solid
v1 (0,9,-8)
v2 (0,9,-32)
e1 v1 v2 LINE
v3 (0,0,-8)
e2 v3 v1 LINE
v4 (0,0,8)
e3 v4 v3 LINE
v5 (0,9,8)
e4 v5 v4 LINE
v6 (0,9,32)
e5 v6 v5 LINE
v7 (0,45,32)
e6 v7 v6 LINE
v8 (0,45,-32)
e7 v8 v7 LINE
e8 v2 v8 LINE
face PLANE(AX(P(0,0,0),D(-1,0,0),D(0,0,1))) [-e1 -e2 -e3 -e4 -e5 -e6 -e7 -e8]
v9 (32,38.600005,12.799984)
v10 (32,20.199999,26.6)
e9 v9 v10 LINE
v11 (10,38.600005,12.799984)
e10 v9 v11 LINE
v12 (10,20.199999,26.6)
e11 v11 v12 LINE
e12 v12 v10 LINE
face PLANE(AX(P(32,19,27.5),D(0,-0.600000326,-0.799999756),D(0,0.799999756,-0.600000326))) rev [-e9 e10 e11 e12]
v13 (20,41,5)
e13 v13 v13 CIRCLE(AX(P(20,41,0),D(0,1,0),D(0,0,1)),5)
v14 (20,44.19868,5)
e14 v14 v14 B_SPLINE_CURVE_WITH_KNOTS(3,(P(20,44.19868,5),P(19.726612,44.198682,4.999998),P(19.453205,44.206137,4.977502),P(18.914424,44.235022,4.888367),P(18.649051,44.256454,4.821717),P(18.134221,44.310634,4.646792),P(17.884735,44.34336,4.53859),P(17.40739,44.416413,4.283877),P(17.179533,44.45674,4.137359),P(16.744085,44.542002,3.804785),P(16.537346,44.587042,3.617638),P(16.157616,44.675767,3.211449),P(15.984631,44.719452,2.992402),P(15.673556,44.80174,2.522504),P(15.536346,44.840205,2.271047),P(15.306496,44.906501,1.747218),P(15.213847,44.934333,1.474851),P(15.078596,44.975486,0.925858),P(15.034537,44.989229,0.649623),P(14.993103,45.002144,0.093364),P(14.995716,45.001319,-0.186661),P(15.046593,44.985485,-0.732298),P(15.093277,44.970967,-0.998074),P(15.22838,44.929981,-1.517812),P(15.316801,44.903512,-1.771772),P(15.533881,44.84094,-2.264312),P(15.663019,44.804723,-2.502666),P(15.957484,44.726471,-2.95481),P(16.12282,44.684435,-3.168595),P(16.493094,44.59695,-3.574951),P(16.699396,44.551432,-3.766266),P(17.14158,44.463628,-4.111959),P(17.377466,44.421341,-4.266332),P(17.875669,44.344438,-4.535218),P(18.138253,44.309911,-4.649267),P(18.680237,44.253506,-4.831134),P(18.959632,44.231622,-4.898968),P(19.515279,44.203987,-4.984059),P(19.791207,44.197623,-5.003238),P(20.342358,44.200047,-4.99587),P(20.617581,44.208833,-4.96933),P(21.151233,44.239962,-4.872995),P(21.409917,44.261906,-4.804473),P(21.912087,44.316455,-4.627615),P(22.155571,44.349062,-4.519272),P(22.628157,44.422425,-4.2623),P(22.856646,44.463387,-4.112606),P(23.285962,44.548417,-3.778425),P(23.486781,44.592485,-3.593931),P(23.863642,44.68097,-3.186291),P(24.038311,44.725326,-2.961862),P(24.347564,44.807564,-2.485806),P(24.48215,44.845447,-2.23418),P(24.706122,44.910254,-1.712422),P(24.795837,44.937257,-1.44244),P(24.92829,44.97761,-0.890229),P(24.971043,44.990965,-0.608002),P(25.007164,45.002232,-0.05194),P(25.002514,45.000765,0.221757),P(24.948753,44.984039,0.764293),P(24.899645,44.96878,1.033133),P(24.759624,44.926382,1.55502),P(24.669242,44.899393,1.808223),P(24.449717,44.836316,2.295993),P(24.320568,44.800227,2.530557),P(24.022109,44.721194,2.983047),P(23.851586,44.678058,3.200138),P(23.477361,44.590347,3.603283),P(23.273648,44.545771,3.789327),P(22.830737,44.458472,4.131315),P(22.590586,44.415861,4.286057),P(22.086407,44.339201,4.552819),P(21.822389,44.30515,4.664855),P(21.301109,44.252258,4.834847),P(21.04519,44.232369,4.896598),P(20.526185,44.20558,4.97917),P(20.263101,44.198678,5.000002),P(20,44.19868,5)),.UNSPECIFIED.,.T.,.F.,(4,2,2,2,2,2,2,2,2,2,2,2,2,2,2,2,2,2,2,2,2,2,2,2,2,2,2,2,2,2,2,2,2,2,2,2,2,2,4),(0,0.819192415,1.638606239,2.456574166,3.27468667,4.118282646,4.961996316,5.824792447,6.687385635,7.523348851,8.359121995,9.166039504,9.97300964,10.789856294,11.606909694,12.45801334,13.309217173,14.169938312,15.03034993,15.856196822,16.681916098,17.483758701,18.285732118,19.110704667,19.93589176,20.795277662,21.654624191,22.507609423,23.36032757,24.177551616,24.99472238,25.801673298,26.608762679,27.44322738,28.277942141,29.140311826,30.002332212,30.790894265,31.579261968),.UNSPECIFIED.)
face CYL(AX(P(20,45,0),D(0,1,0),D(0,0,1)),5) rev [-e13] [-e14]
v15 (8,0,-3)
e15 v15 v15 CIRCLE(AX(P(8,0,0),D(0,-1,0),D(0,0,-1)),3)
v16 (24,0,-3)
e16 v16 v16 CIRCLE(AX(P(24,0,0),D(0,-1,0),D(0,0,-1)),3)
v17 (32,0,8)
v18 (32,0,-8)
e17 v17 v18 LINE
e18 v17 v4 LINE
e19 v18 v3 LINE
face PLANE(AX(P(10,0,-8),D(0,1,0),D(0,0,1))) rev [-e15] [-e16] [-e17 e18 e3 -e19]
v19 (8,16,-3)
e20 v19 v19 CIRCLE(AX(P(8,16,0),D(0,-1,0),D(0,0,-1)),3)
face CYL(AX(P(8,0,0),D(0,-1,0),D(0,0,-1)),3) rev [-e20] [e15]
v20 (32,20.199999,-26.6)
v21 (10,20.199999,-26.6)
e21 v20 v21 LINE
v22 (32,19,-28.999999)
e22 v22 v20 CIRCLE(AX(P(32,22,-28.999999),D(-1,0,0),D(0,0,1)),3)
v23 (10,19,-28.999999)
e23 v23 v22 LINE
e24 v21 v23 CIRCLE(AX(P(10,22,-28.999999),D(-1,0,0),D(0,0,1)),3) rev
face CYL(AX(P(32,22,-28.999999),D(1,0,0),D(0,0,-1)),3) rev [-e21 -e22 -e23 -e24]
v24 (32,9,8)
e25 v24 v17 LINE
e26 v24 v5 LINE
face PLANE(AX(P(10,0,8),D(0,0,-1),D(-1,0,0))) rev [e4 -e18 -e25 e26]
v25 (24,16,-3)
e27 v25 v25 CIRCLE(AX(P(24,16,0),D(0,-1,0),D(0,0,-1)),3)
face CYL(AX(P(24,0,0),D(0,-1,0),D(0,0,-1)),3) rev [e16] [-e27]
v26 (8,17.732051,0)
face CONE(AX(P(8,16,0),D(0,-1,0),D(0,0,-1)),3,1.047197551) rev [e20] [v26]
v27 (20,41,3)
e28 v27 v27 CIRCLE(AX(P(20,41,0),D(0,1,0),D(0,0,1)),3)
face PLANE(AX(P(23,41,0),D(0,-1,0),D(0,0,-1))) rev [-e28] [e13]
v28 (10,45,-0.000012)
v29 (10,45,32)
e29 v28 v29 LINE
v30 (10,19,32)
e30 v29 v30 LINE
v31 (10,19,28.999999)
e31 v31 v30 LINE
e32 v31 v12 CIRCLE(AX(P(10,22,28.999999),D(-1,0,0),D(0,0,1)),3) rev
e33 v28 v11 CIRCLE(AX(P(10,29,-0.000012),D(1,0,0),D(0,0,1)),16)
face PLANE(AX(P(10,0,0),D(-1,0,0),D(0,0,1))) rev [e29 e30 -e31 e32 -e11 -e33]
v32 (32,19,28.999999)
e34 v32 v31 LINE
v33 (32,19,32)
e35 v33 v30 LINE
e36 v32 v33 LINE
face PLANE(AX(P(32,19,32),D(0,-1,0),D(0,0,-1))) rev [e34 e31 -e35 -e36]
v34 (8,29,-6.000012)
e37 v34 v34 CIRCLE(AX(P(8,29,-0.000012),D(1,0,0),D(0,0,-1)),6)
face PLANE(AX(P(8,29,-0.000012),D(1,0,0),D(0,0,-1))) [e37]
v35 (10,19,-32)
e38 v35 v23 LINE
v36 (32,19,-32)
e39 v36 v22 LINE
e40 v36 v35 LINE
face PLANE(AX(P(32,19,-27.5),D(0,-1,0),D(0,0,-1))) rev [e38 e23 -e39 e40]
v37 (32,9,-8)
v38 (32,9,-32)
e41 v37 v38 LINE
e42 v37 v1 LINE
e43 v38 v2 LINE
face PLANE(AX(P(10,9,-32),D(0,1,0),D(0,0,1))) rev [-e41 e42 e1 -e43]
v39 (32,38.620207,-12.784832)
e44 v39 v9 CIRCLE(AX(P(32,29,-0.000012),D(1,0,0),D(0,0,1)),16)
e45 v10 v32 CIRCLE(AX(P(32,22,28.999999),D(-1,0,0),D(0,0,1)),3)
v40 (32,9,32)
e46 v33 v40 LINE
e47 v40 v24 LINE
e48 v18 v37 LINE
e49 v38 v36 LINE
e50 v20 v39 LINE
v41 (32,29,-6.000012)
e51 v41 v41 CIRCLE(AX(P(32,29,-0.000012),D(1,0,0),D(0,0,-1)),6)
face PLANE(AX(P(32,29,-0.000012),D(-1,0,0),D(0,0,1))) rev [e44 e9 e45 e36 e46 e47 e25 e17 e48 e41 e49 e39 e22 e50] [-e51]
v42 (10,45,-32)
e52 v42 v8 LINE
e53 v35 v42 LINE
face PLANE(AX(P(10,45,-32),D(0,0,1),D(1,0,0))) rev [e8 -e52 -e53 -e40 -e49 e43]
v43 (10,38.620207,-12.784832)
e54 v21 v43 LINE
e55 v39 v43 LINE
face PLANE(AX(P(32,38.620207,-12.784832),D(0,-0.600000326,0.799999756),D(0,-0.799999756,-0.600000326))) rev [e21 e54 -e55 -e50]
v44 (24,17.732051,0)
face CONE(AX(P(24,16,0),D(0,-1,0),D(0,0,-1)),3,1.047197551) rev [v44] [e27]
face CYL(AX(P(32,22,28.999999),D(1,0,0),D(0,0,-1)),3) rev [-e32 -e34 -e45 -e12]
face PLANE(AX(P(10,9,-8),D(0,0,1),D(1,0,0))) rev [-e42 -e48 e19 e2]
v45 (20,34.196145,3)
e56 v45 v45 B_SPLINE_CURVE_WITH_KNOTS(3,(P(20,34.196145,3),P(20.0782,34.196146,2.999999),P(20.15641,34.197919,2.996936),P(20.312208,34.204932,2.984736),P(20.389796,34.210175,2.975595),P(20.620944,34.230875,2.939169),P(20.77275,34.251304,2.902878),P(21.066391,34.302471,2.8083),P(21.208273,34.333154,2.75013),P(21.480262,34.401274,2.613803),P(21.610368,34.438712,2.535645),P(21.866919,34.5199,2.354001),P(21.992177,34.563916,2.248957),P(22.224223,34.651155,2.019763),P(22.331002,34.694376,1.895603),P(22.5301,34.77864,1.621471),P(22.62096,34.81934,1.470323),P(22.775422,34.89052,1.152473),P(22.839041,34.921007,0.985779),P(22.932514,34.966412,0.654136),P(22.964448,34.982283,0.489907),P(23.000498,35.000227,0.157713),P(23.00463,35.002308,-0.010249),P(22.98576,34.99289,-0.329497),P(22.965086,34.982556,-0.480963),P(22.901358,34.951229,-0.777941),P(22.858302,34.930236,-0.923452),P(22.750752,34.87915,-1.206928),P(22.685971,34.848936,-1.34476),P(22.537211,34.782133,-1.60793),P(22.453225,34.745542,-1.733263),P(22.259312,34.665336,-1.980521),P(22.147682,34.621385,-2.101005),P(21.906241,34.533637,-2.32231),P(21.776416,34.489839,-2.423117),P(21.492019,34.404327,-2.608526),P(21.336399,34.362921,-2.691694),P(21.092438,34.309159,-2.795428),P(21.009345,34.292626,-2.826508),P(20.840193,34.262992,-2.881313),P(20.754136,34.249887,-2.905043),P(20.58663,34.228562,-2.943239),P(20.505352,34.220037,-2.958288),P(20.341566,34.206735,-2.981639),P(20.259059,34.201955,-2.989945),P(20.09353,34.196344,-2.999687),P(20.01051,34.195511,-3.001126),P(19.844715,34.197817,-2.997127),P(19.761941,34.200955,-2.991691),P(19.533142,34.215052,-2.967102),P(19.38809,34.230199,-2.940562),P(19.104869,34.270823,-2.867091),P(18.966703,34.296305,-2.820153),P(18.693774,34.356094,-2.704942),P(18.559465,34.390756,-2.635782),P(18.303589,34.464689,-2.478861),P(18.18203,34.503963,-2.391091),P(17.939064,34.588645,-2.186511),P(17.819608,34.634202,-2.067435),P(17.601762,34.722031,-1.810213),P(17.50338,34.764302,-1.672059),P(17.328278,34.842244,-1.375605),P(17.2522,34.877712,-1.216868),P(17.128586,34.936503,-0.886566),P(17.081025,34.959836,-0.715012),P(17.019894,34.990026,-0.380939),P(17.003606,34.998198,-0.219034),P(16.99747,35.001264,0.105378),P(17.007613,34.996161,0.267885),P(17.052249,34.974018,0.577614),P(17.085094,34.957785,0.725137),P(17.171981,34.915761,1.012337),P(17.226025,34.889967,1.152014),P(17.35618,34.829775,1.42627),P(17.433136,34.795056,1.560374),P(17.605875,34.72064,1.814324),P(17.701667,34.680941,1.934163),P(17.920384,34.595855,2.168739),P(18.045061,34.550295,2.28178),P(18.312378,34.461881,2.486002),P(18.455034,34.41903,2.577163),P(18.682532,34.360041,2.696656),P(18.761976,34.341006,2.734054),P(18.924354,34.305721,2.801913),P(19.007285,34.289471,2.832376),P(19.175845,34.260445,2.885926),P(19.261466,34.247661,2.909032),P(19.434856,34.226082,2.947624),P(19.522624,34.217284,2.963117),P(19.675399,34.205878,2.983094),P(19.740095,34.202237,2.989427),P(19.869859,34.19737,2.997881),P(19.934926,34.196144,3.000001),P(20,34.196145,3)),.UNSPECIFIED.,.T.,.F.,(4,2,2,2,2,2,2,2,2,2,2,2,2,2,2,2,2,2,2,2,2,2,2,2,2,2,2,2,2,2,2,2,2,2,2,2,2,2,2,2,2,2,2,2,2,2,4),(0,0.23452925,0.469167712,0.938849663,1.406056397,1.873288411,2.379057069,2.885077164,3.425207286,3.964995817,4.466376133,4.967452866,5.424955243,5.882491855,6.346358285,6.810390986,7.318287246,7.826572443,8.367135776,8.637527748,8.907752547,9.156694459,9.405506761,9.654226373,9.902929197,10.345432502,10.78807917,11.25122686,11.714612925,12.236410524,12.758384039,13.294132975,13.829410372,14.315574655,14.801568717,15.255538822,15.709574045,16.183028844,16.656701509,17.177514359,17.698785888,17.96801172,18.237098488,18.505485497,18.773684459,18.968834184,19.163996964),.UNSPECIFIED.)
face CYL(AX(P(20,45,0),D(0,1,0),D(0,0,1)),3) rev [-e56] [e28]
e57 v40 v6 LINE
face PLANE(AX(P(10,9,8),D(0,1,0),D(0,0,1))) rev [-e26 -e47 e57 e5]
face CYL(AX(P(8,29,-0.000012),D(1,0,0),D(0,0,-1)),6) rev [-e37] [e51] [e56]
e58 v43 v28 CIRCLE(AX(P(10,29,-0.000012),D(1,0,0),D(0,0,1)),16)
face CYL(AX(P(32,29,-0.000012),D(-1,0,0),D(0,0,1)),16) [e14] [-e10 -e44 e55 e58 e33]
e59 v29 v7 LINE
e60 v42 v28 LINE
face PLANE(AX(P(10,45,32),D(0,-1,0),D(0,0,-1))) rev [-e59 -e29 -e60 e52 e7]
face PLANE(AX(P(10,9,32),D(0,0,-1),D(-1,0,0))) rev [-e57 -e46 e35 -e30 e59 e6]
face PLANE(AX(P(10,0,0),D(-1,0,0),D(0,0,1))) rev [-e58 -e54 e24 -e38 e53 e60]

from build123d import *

# Parameters (mm, degrees)
BOSS_EXTRUDE1_DEPTH = 10
BOSS_EXTRUDE2_DEPTH = 22
SKETCH4_R           = 6
CUT_EXTRUDE1_DEPTH  = 24
LPATTERN1_COUNT     = 2
LPATTERN1_PITCH     = 16
FILLET1_R           = 3


# Read off the part's stored shape, not the designer's step: CBORE for M5 Hex Head Bolt1
with BuildPart() as part:
    # Sketch2 → Boss-Extrude1 (new body)
    with BuildSketch(Plane(origin=(0, 0, 0), x_dir=(0, 0, -1), z_dir=(1, 0, 0))):
        Polygon((-32, 45), (32, 45), (32, 9), (8, 9), (8, 0), (-8, 0), (-8, 9), (-32, 9), align=None)
    extrude(amount=BOSS_EXTRUDE1_DEPTH)

    # Sketch3 → Boss-Extrude2 (add)
    with BuildSketch(Plane(origin=(10, 0, 0), x_dir=(0, 0, -1), z_dir=(1, 0, 0))):
        with BuildLine():
            Line((32, 9), (32, 19))
            Line((32, 19), (27.5, 19))
            Line((27.5, 19), (12.784832124, 38.620207192))
            ThreePointArc((12.784832124, 38.620207192), (-0.012621258, 44.999995012), (-12.799983622, 38.600005212))
            Line((-12.799983622, 38.600005212), (-27.5, 19))
            Line((-27.5, 19), (-32, 19))
            Line((-32, 19), (-32, 9))
            Line((-32, 9), (-8, 9))
            Line((-8, 9), (-8, 0))
            Line((-8, 0), (8, 0))
            Line((8, 0), (8, 9))
            Line((8, 9), (32, 9))
        make_face()
    extrude(amount=BOSS_EXTRUDE2_DEPTH)

    # Sketch4 → Cut-Extrude1 (cut)
    with BuildSketch(Plane(origin=(32, 0, 0), x_dir=(0, 0, -1), z_dir=(1, 0, 0))):
        with Locations((1.247e-05, 29)):
            Circle(SKETCH4_R)
    extrude(amount=-CUT_EXTRUDE1_DEPTH, mode=Mode.SUBTRACT)

    # CBORE for M5 Hex Head Bolt1 outline → CBORE for M5 Hex Head Bolt1 (revolve, cut)
    with BuildSketch(Plane(origin=(20, 0, 0), x_dir=(1, 0, 0), z_dir=(0, 0, 1))):
        Polygon((3, 41), (5, 41), (5, 45.000103402), (0, 45.000103402), (0, 34.195861277), (3, 34.195861277), align=None)
    revolve(axis=Axis((20, 0, 0), (0, 1, 0)), mode=Mode.SUBTRACT)

    # Sketch9 → Ø1.0mm Dowel Hole3 (revolve, cut)
    with BuildSketch(Plane(origin=(24, 0, 0), x_dir=(0, 0, -1), z_dir=(1, 0, 0))):
        Polygon((0, 0), (0, 17.732050808), (3, 16), (3, 0), align=None)
    f_1_0mm_dowel_hole3 = revolve(axis=Axis((24, -6.35, 0), (0, 1, 0)), mode=Mode.SUBTRACT)

    # LPattern1: Ø1.0mm Dowel Hole3 ×2
    with Locations(*[(-i * LPATTERN1_PITCH, 0, 0) for i in range(1, LPATTERN1_COUNT)]):
        add(f_1_0mm_dowel_hole3, mode=Mode.SUBTRACT)

    # Fillet1
    fillet1_edges = [part.edges().sort_by_distance(p)[0] for p in [
        (21, 19, -27.5),
        (21, 19, 27.5),
    ]]
    fillet(fillet1_edges, radius=FILLET1_R)


solid = part.part
